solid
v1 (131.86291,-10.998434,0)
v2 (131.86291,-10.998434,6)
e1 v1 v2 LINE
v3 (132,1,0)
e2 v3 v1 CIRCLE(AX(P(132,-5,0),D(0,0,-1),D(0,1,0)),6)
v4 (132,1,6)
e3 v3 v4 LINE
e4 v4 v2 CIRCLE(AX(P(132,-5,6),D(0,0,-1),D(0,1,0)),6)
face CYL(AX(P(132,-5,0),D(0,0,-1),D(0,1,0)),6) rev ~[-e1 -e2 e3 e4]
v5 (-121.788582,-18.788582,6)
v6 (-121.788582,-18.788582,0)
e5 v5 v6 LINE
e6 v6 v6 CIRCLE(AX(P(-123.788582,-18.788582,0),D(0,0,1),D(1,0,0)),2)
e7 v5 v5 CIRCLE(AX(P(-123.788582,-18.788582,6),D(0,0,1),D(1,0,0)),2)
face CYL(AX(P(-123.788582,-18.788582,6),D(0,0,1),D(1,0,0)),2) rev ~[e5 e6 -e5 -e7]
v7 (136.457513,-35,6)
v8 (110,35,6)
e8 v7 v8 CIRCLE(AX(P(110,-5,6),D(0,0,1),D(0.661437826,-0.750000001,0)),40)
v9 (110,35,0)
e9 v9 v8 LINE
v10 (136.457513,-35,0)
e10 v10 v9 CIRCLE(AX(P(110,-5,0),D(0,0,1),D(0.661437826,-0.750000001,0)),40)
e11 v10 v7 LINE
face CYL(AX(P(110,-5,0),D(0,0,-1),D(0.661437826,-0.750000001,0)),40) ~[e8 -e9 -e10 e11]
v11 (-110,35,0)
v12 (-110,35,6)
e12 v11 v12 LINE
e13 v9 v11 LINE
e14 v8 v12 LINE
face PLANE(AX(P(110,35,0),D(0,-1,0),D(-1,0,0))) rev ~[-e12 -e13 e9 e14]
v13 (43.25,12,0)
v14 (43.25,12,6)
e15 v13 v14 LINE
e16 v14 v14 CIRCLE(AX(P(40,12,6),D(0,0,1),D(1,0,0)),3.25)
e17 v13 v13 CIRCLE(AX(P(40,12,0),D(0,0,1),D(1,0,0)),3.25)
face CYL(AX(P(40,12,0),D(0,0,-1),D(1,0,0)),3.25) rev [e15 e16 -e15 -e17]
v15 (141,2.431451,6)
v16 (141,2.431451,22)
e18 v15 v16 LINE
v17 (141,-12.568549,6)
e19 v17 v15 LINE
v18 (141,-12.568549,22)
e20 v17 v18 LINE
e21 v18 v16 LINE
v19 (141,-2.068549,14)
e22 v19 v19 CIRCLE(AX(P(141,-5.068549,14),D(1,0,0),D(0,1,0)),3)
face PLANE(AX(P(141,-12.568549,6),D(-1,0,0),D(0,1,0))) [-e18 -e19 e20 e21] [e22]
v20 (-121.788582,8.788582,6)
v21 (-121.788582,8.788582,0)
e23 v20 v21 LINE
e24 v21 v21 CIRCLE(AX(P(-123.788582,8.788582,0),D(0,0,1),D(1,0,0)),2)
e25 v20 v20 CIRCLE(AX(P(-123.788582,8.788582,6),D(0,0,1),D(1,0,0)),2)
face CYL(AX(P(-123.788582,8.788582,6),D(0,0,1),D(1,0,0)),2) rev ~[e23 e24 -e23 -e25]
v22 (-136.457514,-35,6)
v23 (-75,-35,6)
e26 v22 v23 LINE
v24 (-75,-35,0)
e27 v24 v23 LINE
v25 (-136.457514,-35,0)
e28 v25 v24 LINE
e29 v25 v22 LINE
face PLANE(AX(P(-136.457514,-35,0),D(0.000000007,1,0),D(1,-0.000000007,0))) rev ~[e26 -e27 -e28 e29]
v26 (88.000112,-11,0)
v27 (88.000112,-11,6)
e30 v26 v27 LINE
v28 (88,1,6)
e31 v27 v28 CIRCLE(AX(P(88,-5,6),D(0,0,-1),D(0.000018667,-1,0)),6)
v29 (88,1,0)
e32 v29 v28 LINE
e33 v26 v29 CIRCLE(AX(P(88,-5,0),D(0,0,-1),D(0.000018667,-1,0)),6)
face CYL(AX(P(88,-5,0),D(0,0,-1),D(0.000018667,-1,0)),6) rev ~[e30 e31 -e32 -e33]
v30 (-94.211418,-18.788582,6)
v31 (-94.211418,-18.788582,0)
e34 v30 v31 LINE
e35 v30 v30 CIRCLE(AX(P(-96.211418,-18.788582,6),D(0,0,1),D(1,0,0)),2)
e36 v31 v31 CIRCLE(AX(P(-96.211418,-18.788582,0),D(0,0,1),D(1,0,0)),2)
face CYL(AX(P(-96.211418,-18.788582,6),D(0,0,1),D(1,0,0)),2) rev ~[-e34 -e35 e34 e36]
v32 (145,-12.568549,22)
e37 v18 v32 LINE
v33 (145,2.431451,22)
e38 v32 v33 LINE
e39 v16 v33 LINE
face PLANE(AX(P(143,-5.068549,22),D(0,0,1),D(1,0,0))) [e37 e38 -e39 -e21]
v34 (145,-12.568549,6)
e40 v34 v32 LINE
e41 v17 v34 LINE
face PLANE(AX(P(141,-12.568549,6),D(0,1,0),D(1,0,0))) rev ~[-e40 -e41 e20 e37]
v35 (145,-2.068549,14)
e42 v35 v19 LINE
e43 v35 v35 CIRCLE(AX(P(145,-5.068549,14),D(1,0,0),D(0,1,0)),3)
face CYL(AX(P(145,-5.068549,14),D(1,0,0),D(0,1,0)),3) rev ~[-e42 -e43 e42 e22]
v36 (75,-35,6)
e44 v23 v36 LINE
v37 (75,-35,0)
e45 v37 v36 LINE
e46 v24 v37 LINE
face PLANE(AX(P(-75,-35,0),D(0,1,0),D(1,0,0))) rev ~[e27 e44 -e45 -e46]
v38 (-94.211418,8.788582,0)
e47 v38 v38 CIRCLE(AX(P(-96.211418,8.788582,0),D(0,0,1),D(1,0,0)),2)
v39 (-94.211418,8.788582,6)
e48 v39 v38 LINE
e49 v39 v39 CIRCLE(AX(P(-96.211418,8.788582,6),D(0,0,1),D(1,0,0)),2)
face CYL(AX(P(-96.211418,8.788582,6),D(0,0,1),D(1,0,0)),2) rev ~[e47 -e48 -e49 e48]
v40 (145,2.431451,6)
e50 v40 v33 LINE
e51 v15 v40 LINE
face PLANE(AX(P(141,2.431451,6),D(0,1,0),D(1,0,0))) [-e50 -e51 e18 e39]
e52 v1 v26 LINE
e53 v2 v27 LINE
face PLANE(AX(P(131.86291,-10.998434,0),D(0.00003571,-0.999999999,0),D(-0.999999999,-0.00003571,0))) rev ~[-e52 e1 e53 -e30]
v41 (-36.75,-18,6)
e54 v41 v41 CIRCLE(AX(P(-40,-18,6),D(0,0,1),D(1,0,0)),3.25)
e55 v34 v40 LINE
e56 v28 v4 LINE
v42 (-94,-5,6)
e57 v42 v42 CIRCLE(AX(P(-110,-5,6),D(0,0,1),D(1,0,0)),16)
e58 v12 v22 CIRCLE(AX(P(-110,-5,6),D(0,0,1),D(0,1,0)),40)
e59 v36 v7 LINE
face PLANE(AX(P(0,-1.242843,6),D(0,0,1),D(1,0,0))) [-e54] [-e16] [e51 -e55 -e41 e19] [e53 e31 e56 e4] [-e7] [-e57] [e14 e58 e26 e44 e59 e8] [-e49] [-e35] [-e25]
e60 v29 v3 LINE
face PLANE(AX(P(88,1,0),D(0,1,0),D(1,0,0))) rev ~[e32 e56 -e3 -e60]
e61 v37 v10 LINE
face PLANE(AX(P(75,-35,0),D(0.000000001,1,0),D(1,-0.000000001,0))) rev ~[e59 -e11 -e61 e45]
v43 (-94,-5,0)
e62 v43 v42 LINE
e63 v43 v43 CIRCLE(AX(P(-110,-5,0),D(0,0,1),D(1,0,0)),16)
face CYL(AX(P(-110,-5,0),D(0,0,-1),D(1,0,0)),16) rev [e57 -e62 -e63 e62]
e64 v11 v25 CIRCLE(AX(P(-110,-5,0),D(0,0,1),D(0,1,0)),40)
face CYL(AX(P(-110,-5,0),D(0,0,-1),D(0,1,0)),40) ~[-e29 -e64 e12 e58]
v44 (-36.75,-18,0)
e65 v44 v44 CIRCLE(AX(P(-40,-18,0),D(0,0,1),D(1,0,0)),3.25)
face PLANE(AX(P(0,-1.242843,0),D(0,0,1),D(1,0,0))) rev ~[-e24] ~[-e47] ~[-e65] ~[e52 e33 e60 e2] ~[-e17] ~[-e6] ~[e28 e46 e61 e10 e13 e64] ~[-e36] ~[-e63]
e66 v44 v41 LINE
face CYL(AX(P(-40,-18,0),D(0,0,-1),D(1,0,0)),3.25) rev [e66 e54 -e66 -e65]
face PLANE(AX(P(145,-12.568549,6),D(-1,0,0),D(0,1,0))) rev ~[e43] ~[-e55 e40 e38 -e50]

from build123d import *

# Parameters (mm, degrees)
F0_R     = 3.25
F0_R_2   = 16
F1_DEPTH = 6
F2_W     = 4
F2_H     = 15
F3_DEPTH = 16
F4_R     = 3
F5_DEPTH = 25
F6_R     = 2
F6_R_2   = 16
F7_DEPTH = 25


# Not quite as in the source:
# - ends of sketch curves that miss each other by under 0.0002 mm in the source are joined


with BuildPart() as f1:
    # F0 (on Top) → F1 (new body)
    with BuildSketch(Plane.XY):
        with BuildLine():
            ThreePointArc((136.4575130484, -35.0000000549), (147.4165738824, 9.1421355849), (110, 35))
            Line((110, 35), (75, 35))
            Line((75, 35), (-75, 35))
            Line((-75, 35), (-110, 35))
            ThreePointArc((-110, 35), (-147.4165737498, 9.1421359357), (-136.4575136109, -34.9999995588))
            Line((-136.4575136109, -34.9999995588), (-75, -35))
            Line((-75, -35), (75, -35))
            Line((75, -35), (136.4575130484, -35.0000000549))
        make_face()
        with Locations((-40, -18)):
            Circle(F0_R, mode=Mode.SUBTRACT)
        with Locations((-110, -5)):
            Circle(F0_R_2, mode=Mode.SUBTRACT)
        with BuildLine():
            Line((88, 1), (132, 1))
            ThreePointArc((132, 1), (137.9996084013, -5.0685494815), (131.862909985, -10.9984336562))
            Line((131.862909985, -10.9984336562), (88.000112, -11))
            ThreePointArc((88.000112, -11), (82.0000000003, -5.000056), (88, 1))
        make_face(mode=Mode.SUBTRACT)
        with Locations((40, 12)):
            Circle(F0_R, mode=Mode.SUBTRACT)
    extrude(amount=F1_DEPTH)

    # F2 (on face) → F3 (join)
    with BuildSketch(Plane.XY.offset(6)):
        with Locations((143, -5.0685494815)):
            Rectangle(F2_W, F2_H)
    extrude(amount=F3_DEPTH)

    # F4 (on face) → F5 (cut)
    with BuildSketch(Plane.YZ.offset(145)):
        with Locations((-5.0685494815, 14)):
            Circle(F4_R)
    extrude(amount=-F5_DEPTH, mode=Mode.SUBTRACT)

    # F6 (on face) → F7 (cut)
    with BuildSketch(Plane.XY.offset(6)):
        with Locations((-123.7885822331, 8.7885822331)):
            Circle(F6_R)
        with Locations((-96.2114177669, 8.7885822331)):
            Circle(F6_R)
        with Locations((-96.2114177669, -18.7885822331)):
            Circle(F6_R)
        with Locations((-123.7885822331, -18.7885822331)):
            Circle(F6_R)
        with Locations((-110, -5)):
            Circle(F6_R_2)
    extrude(amount=-F7_DEPTH, mode=Mode.SUBTRACT)


solid = f1.part
